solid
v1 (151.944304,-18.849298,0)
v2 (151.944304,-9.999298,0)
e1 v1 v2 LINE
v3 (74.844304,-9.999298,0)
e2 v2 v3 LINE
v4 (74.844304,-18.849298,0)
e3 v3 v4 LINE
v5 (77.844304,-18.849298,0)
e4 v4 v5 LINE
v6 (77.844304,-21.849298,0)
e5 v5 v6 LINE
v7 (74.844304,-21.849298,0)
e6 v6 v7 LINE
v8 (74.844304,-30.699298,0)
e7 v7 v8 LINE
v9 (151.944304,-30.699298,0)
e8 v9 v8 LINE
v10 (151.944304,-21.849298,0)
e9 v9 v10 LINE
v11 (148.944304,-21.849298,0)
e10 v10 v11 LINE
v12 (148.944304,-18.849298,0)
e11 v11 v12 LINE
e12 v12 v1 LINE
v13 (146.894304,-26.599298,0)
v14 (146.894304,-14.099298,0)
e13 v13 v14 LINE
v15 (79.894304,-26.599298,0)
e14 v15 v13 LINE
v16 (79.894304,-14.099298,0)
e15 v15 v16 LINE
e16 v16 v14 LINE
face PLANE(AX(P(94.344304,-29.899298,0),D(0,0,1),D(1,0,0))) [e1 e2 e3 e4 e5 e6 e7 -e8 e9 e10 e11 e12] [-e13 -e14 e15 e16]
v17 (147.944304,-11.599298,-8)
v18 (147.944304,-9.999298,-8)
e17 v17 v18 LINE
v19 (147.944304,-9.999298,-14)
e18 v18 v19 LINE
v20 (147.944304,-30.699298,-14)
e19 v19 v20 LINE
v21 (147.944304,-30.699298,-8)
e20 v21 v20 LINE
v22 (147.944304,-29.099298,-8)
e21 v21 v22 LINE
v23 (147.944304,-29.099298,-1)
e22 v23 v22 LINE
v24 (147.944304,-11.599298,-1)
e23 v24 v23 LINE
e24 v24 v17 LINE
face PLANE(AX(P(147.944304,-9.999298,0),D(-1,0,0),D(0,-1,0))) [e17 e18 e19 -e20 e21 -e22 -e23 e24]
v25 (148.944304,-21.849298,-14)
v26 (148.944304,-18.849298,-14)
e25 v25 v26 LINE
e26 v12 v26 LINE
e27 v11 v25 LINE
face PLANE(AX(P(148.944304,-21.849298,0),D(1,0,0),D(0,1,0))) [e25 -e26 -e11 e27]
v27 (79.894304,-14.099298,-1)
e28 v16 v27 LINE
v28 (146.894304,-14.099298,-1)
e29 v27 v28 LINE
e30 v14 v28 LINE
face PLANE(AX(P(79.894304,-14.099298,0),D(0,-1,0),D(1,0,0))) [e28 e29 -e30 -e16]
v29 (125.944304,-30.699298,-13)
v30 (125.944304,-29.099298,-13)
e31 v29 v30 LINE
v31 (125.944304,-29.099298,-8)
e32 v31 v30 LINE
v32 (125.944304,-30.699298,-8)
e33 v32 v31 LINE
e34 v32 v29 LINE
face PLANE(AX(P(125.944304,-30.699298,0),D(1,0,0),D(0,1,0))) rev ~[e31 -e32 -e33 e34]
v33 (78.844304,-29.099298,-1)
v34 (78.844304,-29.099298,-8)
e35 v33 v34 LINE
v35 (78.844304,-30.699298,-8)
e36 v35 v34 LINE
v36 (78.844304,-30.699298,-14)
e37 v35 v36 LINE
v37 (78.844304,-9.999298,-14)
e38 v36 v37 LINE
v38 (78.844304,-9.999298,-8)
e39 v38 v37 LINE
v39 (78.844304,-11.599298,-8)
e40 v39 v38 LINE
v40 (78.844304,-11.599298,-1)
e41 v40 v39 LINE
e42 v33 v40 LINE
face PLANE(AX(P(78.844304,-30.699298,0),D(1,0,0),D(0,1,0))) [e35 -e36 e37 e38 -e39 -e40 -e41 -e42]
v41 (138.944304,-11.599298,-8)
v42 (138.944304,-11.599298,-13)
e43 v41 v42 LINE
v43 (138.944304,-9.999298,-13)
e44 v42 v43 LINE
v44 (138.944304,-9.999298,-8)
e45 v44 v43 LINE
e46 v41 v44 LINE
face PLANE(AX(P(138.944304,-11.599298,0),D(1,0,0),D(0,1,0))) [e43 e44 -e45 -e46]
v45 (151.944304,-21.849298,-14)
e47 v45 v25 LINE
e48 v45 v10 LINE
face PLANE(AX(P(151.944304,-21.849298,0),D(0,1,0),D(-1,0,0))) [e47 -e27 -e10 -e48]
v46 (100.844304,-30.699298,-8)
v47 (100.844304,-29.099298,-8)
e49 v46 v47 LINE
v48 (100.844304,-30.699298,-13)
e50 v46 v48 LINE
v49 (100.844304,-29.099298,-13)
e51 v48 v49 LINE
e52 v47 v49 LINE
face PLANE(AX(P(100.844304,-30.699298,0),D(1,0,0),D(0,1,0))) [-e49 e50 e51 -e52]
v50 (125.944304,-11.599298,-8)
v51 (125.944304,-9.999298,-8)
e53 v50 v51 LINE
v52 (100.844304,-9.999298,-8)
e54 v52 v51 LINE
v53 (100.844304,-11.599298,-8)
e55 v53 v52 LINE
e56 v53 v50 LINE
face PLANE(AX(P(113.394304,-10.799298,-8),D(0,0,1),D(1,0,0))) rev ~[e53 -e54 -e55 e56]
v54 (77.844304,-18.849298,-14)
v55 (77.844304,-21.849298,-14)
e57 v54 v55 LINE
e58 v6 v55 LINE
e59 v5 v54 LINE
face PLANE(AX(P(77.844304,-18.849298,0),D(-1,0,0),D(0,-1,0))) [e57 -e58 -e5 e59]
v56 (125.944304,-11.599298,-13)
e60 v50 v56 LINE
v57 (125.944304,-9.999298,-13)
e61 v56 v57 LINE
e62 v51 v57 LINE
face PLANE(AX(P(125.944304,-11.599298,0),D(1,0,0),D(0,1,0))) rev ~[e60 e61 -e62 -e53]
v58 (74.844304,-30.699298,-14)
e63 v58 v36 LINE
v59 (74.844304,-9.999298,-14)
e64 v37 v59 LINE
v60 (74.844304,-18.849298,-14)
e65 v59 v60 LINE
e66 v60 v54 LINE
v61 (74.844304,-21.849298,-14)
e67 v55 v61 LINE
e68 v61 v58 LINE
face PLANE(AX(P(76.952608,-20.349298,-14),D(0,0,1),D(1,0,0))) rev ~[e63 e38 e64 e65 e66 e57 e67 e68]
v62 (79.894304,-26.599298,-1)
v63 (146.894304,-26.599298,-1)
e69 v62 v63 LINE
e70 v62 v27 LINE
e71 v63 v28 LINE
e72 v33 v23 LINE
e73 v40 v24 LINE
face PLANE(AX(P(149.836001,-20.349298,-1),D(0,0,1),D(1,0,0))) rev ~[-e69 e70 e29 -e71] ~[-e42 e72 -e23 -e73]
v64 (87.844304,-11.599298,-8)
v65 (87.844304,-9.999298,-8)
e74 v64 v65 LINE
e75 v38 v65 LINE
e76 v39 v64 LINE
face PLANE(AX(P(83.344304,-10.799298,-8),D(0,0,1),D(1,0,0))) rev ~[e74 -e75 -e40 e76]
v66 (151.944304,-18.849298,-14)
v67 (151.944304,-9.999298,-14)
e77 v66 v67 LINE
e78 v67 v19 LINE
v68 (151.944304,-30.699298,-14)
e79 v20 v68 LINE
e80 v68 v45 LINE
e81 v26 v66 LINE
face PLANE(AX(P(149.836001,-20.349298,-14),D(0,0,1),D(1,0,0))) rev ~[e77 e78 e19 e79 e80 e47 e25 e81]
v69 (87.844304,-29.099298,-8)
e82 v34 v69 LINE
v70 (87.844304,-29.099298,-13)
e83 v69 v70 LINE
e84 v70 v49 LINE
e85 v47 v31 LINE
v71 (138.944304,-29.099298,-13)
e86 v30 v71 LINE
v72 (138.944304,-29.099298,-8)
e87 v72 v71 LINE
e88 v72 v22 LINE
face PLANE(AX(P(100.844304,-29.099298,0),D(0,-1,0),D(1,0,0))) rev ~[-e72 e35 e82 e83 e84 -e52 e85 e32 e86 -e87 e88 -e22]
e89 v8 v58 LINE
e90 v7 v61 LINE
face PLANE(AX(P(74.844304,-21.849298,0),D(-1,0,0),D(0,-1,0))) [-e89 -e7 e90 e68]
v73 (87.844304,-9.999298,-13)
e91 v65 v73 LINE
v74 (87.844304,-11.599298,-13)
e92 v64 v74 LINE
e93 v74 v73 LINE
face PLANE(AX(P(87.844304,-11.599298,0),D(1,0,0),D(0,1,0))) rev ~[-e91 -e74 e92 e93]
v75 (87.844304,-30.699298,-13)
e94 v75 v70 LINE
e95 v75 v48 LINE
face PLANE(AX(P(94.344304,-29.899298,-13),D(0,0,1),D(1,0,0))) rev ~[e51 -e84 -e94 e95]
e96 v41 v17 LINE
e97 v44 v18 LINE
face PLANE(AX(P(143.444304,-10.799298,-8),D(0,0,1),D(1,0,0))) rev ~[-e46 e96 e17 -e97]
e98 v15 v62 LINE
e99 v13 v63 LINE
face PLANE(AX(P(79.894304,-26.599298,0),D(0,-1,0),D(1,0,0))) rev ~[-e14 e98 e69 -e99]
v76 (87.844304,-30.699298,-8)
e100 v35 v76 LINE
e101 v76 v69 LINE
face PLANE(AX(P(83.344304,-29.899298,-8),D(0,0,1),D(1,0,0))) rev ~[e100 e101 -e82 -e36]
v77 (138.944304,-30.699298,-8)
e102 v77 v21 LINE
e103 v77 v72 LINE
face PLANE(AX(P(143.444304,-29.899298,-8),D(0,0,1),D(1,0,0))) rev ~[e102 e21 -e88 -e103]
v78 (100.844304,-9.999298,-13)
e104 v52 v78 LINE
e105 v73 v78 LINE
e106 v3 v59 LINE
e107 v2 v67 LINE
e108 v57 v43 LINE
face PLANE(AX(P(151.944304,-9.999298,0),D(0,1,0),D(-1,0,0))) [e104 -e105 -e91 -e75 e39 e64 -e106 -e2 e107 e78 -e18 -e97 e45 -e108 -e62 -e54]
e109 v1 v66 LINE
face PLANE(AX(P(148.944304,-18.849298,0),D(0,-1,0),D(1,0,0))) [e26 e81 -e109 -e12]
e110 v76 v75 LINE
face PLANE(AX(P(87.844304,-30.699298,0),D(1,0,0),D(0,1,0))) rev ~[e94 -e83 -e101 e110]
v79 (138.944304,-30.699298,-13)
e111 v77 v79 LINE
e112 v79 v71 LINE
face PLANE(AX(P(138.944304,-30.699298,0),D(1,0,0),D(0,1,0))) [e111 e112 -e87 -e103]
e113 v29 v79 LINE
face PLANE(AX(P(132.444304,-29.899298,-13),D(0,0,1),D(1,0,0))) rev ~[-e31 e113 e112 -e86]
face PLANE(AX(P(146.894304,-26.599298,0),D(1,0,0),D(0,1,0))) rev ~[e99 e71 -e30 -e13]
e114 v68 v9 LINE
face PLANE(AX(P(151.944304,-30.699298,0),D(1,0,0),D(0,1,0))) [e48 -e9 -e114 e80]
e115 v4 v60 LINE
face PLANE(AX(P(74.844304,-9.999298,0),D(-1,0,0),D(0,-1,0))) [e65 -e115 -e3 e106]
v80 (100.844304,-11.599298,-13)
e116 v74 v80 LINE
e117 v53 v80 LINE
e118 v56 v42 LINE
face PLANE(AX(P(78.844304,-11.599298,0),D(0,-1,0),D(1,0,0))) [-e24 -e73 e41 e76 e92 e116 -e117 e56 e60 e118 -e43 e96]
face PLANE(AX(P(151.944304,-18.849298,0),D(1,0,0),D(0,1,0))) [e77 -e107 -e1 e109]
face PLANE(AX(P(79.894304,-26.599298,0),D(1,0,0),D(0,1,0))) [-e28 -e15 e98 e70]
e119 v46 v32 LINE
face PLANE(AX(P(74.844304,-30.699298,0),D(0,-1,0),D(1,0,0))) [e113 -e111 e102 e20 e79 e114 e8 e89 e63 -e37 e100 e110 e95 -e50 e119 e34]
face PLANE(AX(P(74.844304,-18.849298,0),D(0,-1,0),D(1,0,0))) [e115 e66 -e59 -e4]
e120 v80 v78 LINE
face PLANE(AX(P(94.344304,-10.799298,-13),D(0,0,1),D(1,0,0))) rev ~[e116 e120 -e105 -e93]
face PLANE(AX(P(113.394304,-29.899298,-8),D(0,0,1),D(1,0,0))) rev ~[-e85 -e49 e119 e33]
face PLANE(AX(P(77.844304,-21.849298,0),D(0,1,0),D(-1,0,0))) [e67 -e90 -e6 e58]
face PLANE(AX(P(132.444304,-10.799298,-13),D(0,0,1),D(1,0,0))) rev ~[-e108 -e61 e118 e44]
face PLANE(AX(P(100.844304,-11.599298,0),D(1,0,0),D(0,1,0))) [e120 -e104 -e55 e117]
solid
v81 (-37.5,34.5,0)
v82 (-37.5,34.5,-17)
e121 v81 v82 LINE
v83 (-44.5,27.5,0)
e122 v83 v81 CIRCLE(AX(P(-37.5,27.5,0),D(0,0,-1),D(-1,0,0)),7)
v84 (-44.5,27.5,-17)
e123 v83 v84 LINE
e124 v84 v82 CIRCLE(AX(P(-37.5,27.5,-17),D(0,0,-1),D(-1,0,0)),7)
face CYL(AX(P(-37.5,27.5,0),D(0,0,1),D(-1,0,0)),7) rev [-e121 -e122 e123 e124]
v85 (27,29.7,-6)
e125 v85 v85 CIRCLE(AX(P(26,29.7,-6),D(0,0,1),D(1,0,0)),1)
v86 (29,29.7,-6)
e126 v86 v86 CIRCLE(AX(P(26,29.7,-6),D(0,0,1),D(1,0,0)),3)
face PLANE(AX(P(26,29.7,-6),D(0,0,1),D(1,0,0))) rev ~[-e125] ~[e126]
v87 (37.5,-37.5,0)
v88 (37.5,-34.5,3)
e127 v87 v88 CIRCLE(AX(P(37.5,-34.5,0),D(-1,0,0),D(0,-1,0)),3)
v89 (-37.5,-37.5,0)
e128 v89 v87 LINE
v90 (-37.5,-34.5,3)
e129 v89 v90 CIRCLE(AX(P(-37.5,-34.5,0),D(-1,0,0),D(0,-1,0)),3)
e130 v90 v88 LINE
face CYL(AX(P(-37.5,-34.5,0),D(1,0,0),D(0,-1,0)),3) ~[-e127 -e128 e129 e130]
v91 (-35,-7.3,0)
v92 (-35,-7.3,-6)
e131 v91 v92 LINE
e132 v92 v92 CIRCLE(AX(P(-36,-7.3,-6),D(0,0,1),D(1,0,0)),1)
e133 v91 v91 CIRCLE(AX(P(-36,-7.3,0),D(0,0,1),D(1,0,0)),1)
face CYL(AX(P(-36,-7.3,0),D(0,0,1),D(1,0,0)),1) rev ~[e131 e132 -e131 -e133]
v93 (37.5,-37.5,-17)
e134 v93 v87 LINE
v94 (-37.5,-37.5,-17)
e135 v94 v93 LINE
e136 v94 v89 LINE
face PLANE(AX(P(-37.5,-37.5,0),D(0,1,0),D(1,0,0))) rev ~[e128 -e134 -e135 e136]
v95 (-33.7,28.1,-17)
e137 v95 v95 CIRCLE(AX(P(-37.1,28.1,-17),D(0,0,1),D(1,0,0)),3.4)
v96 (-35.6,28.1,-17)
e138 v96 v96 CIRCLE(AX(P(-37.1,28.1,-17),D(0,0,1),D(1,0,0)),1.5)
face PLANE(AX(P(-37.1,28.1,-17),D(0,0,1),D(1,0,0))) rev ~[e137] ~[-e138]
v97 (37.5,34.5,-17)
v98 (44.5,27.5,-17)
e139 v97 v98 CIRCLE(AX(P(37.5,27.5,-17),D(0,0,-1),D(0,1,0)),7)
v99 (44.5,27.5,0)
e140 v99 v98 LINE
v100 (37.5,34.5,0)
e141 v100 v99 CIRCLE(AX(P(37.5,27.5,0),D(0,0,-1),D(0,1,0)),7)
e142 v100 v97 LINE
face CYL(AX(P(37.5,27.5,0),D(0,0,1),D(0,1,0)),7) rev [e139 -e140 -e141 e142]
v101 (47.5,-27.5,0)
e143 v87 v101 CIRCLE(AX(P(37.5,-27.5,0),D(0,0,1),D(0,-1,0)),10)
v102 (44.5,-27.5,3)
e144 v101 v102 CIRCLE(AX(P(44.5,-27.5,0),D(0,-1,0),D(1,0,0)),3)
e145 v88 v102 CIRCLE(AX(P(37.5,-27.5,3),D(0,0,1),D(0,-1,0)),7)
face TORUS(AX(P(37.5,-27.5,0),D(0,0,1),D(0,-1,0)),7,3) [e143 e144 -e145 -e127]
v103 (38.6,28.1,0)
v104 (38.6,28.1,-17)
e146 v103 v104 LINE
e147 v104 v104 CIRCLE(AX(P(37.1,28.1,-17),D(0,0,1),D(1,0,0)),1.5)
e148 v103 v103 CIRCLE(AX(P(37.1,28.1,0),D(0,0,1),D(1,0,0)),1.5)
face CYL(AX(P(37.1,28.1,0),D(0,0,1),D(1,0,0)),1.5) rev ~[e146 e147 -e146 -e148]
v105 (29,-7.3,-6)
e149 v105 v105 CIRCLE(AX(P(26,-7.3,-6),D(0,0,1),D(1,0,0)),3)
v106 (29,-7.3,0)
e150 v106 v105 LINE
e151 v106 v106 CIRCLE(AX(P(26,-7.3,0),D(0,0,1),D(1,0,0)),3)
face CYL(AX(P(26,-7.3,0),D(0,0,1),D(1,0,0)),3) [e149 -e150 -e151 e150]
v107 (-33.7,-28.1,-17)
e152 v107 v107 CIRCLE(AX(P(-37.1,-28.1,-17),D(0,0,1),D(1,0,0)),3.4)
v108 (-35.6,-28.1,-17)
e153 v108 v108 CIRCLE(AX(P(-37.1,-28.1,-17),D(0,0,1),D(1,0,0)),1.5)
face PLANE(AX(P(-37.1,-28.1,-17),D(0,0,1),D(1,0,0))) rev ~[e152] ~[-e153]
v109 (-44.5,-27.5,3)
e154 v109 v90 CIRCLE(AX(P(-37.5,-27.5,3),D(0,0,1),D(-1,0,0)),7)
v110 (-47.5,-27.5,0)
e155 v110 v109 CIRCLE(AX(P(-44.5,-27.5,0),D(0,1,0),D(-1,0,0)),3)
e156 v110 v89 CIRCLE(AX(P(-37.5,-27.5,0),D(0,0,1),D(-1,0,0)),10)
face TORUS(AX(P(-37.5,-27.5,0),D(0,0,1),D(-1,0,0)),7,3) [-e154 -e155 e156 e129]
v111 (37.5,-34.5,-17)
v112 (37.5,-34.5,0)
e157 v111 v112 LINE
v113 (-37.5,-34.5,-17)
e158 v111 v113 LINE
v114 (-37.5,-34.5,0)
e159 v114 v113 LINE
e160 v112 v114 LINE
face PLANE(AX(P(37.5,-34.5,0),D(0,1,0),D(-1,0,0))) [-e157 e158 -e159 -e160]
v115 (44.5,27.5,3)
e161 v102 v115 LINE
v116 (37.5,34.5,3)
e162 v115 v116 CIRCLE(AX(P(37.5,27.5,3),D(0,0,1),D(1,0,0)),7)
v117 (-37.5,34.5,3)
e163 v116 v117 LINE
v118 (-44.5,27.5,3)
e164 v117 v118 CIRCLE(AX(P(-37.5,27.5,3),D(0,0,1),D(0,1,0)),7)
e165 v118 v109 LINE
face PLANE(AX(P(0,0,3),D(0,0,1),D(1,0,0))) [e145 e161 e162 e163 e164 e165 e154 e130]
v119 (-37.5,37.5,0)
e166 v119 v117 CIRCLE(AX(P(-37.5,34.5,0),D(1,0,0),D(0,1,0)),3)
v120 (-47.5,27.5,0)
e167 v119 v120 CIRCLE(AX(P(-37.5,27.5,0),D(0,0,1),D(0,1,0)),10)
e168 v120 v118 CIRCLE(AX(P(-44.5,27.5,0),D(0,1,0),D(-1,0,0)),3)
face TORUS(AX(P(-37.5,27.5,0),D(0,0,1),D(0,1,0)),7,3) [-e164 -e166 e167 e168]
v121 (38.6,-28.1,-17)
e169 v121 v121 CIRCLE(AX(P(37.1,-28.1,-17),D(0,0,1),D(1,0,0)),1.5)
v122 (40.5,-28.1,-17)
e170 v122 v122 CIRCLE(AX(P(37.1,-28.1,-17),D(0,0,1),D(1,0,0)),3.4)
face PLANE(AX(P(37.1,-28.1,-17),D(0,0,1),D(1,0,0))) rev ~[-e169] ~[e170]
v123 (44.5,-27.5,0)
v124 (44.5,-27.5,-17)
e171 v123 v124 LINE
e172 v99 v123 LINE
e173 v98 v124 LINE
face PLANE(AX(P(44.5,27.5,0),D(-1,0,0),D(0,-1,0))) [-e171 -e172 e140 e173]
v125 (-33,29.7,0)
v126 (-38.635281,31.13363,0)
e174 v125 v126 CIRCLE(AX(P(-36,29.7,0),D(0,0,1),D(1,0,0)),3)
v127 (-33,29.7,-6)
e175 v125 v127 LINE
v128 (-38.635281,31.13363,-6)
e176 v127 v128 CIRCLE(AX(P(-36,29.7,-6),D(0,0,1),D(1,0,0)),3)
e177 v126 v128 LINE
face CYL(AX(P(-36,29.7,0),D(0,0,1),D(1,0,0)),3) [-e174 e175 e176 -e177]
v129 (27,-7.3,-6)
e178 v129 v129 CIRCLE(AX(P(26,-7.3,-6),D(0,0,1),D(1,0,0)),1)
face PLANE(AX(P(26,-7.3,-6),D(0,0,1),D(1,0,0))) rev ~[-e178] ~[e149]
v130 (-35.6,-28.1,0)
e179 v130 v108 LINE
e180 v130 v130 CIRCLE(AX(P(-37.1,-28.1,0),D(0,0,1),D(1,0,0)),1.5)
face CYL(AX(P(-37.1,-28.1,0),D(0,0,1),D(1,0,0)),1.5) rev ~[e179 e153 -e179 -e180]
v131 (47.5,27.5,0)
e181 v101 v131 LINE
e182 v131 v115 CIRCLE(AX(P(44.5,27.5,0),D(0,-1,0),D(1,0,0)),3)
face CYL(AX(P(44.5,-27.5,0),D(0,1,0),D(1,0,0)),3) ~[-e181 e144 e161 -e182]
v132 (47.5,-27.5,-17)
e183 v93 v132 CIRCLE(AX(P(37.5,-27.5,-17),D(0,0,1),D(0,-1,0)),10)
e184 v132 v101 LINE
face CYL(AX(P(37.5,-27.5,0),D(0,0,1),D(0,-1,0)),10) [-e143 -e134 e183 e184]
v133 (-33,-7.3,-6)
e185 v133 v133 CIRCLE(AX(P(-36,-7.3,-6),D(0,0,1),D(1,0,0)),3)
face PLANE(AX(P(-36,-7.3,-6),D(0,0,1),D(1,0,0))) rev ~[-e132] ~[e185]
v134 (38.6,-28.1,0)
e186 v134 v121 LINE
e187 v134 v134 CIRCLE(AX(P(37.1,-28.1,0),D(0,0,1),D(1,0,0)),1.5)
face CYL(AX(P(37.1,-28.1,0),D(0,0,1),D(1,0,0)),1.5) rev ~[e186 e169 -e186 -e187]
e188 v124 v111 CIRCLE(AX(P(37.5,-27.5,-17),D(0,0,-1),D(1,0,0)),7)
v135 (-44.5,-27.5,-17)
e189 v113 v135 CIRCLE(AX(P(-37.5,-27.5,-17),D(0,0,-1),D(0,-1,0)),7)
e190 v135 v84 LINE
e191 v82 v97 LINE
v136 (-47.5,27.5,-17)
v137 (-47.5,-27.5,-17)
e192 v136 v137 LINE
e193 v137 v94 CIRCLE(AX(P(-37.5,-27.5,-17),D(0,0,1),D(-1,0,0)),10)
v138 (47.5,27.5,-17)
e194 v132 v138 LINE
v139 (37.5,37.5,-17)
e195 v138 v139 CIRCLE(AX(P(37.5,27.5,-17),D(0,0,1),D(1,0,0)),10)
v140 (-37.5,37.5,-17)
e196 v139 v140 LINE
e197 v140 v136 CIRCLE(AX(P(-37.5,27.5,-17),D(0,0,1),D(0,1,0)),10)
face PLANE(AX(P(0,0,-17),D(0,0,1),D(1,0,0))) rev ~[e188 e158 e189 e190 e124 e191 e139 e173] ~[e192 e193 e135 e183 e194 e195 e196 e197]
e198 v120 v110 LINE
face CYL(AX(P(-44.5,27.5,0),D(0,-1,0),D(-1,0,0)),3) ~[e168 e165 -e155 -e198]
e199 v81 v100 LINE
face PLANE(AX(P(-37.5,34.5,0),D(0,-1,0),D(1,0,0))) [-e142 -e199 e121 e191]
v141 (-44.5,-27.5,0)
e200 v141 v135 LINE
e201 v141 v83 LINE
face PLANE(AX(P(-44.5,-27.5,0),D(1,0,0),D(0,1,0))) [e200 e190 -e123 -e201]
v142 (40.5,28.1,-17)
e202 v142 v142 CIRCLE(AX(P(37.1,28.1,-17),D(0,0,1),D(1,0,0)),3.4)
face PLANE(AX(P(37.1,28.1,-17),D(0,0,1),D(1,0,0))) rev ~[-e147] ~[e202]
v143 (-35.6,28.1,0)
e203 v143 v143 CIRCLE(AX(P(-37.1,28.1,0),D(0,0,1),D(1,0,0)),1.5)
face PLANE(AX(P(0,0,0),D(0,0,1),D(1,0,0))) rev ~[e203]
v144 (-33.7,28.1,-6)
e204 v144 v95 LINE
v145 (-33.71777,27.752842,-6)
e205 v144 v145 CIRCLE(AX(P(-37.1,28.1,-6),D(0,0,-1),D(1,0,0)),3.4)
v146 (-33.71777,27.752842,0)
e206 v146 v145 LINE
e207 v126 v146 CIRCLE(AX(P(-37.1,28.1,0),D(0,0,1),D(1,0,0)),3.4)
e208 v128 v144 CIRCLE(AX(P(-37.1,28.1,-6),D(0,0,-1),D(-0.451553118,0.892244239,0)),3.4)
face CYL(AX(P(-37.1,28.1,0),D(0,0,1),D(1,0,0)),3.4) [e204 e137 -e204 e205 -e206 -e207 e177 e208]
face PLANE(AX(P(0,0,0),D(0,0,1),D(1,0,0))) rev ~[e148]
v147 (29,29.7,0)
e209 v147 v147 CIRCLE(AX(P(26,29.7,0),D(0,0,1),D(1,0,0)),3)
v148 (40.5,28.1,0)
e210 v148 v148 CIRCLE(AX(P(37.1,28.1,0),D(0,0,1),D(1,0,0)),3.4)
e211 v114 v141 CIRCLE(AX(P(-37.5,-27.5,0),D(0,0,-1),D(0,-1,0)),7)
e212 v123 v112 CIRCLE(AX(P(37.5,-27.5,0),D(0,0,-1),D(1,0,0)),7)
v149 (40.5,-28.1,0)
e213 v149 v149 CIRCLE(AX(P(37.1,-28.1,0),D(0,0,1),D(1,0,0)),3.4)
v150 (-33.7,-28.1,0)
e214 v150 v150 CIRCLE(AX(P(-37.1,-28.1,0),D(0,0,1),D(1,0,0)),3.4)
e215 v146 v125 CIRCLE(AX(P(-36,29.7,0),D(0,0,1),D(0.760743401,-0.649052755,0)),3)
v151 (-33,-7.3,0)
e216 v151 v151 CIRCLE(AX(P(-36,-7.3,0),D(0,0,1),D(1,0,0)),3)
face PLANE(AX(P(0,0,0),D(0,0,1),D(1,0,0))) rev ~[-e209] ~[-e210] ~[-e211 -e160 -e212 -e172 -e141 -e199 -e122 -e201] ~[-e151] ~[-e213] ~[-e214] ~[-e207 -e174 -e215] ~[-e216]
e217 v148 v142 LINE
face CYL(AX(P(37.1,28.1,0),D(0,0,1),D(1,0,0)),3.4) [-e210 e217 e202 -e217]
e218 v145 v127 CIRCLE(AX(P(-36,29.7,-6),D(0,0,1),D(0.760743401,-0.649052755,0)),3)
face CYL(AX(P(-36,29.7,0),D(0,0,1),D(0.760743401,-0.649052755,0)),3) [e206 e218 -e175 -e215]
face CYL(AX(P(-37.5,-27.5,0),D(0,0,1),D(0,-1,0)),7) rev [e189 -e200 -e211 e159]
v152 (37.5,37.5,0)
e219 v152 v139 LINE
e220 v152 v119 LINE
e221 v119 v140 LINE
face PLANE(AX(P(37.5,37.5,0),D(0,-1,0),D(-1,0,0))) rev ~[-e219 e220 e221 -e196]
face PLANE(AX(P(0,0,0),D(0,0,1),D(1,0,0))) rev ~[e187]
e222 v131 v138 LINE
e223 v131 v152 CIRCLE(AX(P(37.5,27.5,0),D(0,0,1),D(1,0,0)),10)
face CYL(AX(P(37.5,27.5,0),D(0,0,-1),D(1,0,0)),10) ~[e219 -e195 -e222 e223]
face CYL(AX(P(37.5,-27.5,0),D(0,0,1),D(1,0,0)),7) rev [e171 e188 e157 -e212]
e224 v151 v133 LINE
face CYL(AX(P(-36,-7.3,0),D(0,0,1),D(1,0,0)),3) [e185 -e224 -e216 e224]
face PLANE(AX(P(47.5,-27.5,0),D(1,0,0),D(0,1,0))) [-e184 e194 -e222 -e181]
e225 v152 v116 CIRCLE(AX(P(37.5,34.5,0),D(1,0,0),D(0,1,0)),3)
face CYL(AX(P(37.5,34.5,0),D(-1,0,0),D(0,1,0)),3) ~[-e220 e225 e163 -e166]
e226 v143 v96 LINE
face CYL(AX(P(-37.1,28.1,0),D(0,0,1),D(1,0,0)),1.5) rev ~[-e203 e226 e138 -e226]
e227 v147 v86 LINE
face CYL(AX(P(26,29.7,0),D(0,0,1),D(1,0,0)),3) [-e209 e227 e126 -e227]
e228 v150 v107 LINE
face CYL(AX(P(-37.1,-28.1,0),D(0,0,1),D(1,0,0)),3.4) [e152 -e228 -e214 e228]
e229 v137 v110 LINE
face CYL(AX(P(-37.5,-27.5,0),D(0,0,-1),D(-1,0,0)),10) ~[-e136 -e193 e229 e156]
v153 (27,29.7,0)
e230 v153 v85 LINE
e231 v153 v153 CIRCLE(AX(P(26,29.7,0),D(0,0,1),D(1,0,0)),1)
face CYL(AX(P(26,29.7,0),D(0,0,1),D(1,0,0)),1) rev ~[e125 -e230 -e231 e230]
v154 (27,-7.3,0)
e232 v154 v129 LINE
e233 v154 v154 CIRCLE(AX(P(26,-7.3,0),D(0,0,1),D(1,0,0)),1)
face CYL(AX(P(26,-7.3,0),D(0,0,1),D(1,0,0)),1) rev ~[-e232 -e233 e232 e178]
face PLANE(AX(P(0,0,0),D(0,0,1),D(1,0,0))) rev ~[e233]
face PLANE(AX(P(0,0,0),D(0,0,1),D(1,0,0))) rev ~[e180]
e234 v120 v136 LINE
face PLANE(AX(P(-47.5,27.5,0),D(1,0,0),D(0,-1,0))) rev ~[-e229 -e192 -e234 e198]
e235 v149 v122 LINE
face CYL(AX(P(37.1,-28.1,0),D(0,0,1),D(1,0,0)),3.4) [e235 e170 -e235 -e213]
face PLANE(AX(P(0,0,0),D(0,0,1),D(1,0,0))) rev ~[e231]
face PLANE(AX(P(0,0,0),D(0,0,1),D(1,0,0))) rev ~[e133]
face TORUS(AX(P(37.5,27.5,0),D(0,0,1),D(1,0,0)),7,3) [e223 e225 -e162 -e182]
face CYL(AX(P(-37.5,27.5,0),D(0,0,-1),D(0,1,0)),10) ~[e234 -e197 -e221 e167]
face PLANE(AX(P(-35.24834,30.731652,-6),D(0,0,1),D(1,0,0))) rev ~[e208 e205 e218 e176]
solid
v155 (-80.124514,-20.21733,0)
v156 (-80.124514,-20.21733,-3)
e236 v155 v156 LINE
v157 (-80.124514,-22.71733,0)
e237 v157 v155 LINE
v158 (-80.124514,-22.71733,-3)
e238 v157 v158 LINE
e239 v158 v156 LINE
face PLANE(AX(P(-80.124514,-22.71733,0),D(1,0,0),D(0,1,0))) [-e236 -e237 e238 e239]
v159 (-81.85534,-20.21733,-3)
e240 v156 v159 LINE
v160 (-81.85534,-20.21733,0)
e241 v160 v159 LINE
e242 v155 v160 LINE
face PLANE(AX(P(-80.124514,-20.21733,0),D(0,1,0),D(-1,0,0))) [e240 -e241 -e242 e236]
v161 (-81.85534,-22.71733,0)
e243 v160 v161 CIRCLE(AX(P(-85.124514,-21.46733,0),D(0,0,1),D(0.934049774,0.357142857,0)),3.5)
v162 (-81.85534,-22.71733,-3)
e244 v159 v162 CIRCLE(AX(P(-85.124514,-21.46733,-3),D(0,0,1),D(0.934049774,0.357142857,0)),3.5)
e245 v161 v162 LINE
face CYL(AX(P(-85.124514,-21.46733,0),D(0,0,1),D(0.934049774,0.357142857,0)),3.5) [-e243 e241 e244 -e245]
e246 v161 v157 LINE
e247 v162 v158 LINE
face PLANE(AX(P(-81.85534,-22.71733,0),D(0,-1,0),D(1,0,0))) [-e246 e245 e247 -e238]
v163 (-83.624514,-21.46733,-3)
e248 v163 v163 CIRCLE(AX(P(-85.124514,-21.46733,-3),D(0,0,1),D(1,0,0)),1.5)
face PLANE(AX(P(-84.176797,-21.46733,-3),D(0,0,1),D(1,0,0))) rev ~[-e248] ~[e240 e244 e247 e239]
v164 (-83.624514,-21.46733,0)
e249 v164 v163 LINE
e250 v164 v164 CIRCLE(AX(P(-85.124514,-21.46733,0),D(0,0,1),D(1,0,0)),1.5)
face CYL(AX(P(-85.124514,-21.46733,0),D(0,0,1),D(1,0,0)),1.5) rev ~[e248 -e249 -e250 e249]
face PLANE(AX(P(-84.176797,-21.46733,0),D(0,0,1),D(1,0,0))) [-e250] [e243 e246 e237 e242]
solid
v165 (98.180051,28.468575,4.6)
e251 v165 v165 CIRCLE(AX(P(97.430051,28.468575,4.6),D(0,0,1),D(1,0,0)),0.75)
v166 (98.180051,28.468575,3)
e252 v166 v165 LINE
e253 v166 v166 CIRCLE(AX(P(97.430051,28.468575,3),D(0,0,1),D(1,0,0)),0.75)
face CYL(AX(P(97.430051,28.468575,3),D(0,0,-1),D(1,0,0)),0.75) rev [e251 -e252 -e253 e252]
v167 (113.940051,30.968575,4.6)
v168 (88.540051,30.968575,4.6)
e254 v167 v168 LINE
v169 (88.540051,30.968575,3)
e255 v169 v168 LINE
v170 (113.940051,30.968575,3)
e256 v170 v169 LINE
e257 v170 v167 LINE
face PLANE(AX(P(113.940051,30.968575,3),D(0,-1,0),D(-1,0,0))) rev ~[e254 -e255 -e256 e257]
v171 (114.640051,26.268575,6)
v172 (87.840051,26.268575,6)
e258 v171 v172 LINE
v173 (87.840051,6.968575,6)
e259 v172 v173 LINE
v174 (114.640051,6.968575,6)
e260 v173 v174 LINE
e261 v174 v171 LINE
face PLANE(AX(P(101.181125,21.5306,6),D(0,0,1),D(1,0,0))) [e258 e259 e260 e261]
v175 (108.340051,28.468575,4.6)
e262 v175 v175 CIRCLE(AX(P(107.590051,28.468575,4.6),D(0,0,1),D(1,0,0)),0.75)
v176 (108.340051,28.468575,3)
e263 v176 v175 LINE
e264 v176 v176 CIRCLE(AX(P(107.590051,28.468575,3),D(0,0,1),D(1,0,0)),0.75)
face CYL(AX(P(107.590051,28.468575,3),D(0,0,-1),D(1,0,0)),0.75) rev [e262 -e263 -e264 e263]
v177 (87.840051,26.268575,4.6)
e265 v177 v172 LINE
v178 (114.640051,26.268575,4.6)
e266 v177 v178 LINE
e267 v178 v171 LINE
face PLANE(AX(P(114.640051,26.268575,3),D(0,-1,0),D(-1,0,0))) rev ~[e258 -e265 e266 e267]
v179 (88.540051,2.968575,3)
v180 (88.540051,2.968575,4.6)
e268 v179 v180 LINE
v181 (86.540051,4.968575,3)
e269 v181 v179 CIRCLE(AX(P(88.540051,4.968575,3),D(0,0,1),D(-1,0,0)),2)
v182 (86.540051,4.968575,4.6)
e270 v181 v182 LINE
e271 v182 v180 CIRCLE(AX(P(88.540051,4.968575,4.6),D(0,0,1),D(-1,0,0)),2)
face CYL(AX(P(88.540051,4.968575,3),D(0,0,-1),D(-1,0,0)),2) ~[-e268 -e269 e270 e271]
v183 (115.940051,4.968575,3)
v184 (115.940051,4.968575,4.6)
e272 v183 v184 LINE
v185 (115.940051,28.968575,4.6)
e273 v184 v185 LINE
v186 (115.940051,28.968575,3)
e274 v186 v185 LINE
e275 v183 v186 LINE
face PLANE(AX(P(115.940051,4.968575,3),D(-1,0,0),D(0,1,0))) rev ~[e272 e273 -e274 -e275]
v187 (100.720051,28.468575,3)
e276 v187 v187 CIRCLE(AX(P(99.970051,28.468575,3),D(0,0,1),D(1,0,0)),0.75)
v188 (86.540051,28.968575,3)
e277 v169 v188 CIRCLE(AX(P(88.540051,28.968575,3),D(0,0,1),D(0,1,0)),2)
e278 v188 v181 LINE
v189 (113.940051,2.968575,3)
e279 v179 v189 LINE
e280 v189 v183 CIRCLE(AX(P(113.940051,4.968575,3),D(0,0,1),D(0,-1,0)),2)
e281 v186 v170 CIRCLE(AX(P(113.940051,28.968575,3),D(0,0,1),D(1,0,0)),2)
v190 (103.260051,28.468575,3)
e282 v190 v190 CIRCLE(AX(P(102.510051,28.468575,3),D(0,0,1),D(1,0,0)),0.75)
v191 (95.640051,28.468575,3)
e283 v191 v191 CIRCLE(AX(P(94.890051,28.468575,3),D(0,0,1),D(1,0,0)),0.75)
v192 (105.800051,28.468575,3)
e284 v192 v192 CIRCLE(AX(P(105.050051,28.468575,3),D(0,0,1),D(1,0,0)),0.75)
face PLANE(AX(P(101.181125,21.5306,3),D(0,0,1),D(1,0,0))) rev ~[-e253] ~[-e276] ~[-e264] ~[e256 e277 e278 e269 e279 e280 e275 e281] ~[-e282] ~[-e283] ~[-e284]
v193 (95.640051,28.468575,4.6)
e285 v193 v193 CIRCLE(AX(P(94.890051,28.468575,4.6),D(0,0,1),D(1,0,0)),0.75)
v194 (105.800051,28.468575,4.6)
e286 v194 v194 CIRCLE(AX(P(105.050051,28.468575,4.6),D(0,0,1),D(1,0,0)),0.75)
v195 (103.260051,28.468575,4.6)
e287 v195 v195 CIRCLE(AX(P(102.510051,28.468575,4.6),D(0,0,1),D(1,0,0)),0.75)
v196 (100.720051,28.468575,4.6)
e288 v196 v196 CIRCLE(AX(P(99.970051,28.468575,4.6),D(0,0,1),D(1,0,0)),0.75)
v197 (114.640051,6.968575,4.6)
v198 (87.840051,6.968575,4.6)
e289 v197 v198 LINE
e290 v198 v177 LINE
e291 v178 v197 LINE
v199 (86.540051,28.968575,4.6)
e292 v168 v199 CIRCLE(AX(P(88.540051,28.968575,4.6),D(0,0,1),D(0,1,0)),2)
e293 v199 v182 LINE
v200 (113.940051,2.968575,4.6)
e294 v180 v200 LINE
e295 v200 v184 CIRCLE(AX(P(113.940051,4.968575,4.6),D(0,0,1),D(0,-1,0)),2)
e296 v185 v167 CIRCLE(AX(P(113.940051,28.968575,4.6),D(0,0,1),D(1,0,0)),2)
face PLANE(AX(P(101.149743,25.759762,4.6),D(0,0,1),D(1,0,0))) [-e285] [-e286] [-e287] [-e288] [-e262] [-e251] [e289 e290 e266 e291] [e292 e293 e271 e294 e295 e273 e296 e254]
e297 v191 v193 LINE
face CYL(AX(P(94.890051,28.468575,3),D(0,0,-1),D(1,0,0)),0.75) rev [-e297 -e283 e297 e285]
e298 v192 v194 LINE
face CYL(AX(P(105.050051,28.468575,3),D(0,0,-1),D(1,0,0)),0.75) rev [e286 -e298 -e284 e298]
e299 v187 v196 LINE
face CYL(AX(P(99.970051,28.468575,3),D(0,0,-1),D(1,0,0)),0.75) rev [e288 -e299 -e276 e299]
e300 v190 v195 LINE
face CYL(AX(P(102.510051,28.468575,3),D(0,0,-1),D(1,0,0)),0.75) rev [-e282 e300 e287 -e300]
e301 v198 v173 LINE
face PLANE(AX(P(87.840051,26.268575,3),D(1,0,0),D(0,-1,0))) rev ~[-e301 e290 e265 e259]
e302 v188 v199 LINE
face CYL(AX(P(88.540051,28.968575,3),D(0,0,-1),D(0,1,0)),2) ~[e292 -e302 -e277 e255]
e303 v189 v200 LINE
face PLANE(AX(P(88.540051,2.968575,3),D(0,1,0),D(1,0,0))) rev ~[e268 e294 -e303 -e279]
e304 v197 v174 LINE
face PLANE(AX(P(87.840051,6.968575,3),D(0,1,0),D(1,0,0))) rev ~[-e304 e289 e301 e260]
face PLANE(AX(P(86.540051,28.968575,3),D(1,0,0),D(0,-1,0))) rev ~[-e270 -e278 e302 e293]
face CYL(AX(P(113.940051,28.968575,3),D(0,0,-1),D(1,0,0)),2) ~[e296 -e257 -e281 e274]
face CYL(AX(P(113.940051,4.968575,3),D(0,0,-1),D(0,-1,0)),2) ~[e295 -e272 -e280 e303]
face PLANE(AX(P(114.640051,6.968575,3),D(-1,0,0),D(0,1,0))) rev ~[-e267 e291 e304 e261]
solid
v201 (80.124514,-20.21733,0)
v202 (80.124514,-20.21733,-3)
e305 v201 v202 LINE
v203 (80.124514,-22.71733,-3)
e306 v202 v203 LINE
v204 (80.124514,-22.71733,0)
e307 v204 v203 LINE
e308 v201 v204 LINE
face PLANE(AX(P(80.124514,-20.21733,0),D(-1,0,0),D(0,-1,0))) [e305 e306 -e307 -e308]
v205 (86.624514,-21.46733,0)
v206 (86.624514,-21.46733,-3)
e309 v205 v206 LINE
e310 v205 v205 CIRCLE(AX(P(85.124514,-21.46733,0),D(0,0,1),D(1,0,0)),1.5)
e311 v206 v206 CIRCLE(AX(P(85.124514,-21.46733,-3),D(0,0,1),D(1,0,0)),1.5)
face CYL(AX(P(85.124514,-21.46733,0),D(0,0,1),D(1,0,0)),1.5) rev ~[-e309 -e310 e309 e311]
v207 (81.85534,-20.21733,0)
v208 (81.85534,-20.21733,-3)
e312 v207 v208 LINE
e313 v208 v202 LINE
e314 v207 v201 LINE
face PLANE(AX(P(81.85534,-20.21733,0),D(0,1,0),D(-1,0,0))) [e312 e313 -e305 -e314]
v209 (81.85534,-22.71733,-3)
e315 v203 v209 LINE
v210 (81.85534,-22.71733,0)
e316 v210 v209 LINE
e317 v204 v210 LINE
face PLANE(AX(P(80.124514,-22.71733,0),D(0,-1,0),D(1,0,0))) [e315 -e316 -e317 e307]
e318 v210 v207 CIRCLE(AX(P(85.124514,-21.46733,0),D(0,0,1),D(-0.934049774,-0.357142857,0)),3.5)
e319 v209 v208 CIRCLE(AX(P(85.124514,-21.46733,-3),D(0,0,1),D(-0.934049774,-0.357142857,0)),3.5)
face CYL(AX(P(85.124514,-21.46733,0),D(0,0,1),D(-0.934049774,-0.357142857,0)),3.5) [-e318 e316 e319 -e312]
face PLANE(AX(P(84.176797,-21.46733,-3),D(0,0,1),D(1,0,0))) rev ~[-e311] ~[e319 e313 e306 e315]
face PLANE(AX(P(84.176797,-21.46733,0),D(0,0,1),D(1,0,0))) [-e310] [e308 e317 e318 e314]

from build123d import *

# Parameters (mm, degrees)
F1_W      = 9
F1_H      = 1.6
F1_W_2    = 13
F1_W_3    = 25.1
F1_W_4    = 67
F1_H_2    = 12.5
F3_DEPTH  = 1
F4_DEPTH  = 14
F5_DEPTH  = 8
F6_DEPTH  = 13
F0_R      = 1.5
F7_DEPTH  = 3
F0_R_2    = 3.4
F8_DEPTH  = 3
F9_DEPTH  = 17
F10_R     = 3
F11_R     = 0.75
F11_W     = 26.8
F11_H     = 3.8
F12_DEPTH = 1.6
F13_DEPTH = 3
F2_R      = 3
F2_R_2    = 1
F14_DEPTH = 6


with BuildPart() as f3:
    # F1 (on face) → F3 (new body)
    with BuildSketch(Plane.XY):
        Polygon((147.9443044477, -29.0992980018), (147.9443044477, -30.6992980018), (151.9443044477, -30.6992980018), (151.9443044477, -21.8492980018), (148.9443044477, -21.8492980018), (148.9443044477, -18.8492980018), (151.9443044477, -18.8492980018), (151.9443044477, -9.9992980018), (147.9443044477, -9.9992980018), (147.9443044477, -11.5992980018), align=None)
        with Locations((83.3443044477, -29.8992980018)):
            Rectangle(F1_W, F1_H)
        with Locations((94.3443044477, -29.8992980018)):
            Rectangle(F1_W_2, F1_H)
        with Locations((113.3943044477, -29.8992980018)):
            Rectangle(F1_W_3, F1_H)
        with Locations((132.4443044477, -29.8992980018)):
            Rectangle(F1_W_2, F1_H)
        with Locations((143.4443044477, -29.8992980018)):
            Rectangle(F1_W, F1_H)
        with Locations((83.3443044477, -10.7992980018)):
            Rectangle(F1_W, F1_H)
        with Locations((94.3443044477, -10.7992980018)):
            Rectangle(F1_W_2, F1_H)
        with Locations((113.3943044477, -10.7992980018)):
            Rectangle(F1_W_3, F1_H)
        with Locations((132.4443044477, -10.7992980018)):
            Rectangle(F1_W_2, F1_H)
        with Locations((143.4443044477, -10.7992980018)):
            Rectangle(F1_W, F1_H)
        Polygon((74.8443044477, -21.8492980018), (74.8443044477, -30.6992980018), (78.8443044477, -30.6992980018), (78.8443044477, -29.0992980018), (78.8443044477, -11.5992980018), (78.8443044477, -9.9992980018), (74.8443044477, -9.9992980018), (74.8443044477, -18.8492980018), (77.8443044477, -18.8492980018), (77.8443044477, -20.3492980018), (77.8443044477, -21.8492980018), align=None)
        Polygon((78.8443044477, -11.5992980018), (78.8443044477, -29.0992980018), (87.8443044477, -29.0992980018), (100.8443044477, -29.0992980018), (125.9443044477, -29.0992980018), (138.9443044477, -29.0992980018), (147.9443044477, -29.0992980018), (147.9443044477, -11.5992980018), (138.9443044477, -11.5992980018), (125.9443044477, -11.5992980018), (100.8443044477, -11.5992980018), (87.8443044477, -11.5992980018), align=None)
        with Locations((113.3943044477, -20.3492980018)):
            Rectangle(F1_W_4, F1_H_2, mode=Mode.SUBTRACT)
    extrude(amount=-F3_DEPTH)

    # F1 (on face) → F4 (join)
    with BuildSketch(Plane.XY):
        Polygon((74.8443044477, -21.8492980018), (74.8443044477, -30.6992980018), (78.8443044477, -30.6992980018), (78.8443044477, -29.0992980018), (78.8443044477, -11.5992980018), (78.8443044477, -9.9992980018), (74.8443044477, -9.9992980018), (74.8443044477, -18.8492980018), (77.8443044477, -18.8492980018), (77.8443044477, -20.3492980018), (77.8443044477, -21.8492980018), align=None)
        Polygon((147.9443044477, -29.0992980018), (147.9443044477, -30.6992980018), (151.9443044477, -30.6992980018), (151.9443044477, -21.8492980018), (148.9443044477, -21.8492980018), (148.9443044477, -18.8492980018), (151.9443044477, -18.8492980018), (151.9443044477, -9.9992980018), (147.9443044477, -9.9992980018), (147.9443044477, -11.5992980018), align=None)
    extrude(amount=-F4_DEPTH)

    # F1 (on face) → F5 (join)
    with BuildSketch(Plane.XY):
        with Locations((83.3443044477, -29.8992980018)):
            Rectangle(F1_W, F1_H)
        with Locations((113.3943044477, -29.8992980018)):
            Rectangle(F1_W_3, F1_H)
        with Locations((143.4443044477, -29.8992980018)):
            Rectangle(F1_W, F1_H)
        with Locations((143.4443044477, -10.7992980018)):
            Rectangle(F1_W, F1_H)
        with Locations((113.3943044477, -10.7992980018)):
            Rectangle(F1_W_3, F1_H)
        with Locations((83.3443044477, -10.7992980018)):
            Rectangle(F1_W, F1_H)
    extrude(amount=-F5_DEPTH)

    # F1 (on face) → F6 (join)
    with BuildSketch(Plane.XY):
        with Locations((94.3443044477, -29.8992980018)):
            Rectangle(F1_W_2, F1_H)
        with Locations((132.4443044477, -29.8992980018)):
            Rectangle(F1_W_2, F1_H)
        with Locations((132.4443044477, -10.7992980018)):
            Rectangle(F1_W_2, F1_H)
        with Locations((94.3443044477, -10.7992980018)):
            Rectangle(F1_W_2, F1_H)
    extrude(amount=-F6_DEPTH)


with BuildPart() as f7:
    # F0 (on Top) → F7 (new body)
    with BuildSketch(Plane.XY):
        with BuildLine():
            ThreePointArc((-81.8553396934, -20.217330035), (-88.6245139011, -21.467330035), (-81.8553396934, -22.717330035))
            Line((-81.8553396934, -22.717330035), (-80.1245139011, -22.717330035))
            Line((-80.1245139011, -22.717330035), (-80.1245139011, -20.217330035))
            Line((-80.1245139011, -20.217330035), (-81.8553396934, -20.217330035))
        make_face()
        with Locations((-85.1245139011, -21.467330035)):
            Circle(F0_R, mode=Mode.SUBTRACT)
    extrude(amount=-F7_DEPTH)


with BuildPart() as f7b:
    # F0 (on Top) → F7, piece 2 (new body)
    with BuildSketch(Plane.XY):
        with BuildLine():
            Line((-47.5, 27.5), (-47.5, -27.5))
            ThreePointArc((-47.5, -27.5), (-44.5710678119, -34.5710678119), (-37.5, -37.5))
            Line((-37.5, -37.5), (37.5, -37.5))
            ThreePointArc((37.5, -37.5), (44.5710678119, -34.5710678119), (47.5, -27.5))
            Line((47.5, -27.5), (47.5, 27.5))
            ThreePointArc((47.5, 27.5), (44.5710678119, 34.5710678119), (37.5, 37.5))
            Line((37.5, 37.5), (-37.5, 37.5))
            ThreePointArc((-37.5, 37.5), (-44.5710678119, 34.5710678119), (-47.5, 27.5))
        make_face()
        with BuildLine():
            Line((37.5, -34.5), (-37.5, -34.5))
            ThreePointArc((-37.5, -34.5), (-42.4497474683, -32.4497474683), (-44.5, -27.5))
            Line((-44.5, -27.5), (-44.5, 27.5))
            ThreePointArc((-44.5, 27.5), (-42.4497474683, 32.4497474683), (-37.5, 34.5))
            Line((-37.5, 34.5), (37.5, 34.5))
            ThreePointArc((37.5, 34.5), (42.4497474683, 32.4497474683), (44.5, 27.5))
            Line((44.5, 27.5), (44.5, -27.5))
            ThreePointArc((44.5, -27.5), (42.4497474683, -32.4497474683), (37.5, -34.5))
        make_face(mode=Mode.SUBTRACT)
    extrude(amount=-F7_DEPTH)

    # F0 (on Top) → F8 (join)
    with BuildSketch(Plane.XY):
        with BuildLine():
            Line((-47.5, 27.5), (-47.5, -27.5))
            ThreePointArc((-47.5, -27.5), (-44.5710678119, -34.5710678119), (-37.5, -37.5))
            Line((-37.5, -37.5), (37.5, -37.5))
            ThreePointArc((37.5, -37.5), (44.5710678119, -34.5710678119), (47.5, -27.5))
            Line((47.5, -27.5), (47.5, 27.5))
            ThreePointArc((47.5, 27.5), (44.5710678119, 34.5710678119), (37.5, 37.5))
            Line((37.5, 37.5), (-37.5, 37.5))
            ThreePointArc((-37.5, 37.5), (-44.5710678119, 34.5710678119), (-47.5, 27.5))
        make_face()
        with BuildLine():
            Line((37.5, -34.5), (-37.5, -34.5))
            ThreePointArc((-37.5, -34.5), (-42.4497474683, -32.4497474683), (-44.5, -27.5))
            Line((-44.5, -27.5), (-44.5, 27.5))
            ThreePointArc((-44.5, 27.5), (-42.4497474683, 32.4497474683), (-37.5, 34.5))
            Line((-37.5, 34.5), (37.5, 34.5))
            ThreePointArc((37.5, 34.5), (42.4497474683, 32.4497474683), (44.5, 27.5))
            Line((44.5, 27.5), (44.5, -27.5))
            ThreePointArc((44.5, -27.5), (42.4497474683, -32.4497474683), (37.5, -34.5))
        make_face(mode=Mode.SUBTRACT)
        with BuildLine():
            ThreePointArc((-44.5, -27.5), (-42.4497474683, -32.4497474683), (-37.5, -34.5))
            Line((-37.5, -34.5), (37.5, -34.5))
            ThreePointArc((37.5, -34.5), (42.4497474683, -32.4497474683), (44.5, -27.5))
            Line((44.5, -27.5), (44.5, 27.5))
            ThreePointArc((44.5, 27.5), (42.4497474683, 32.4497474683), (37.5, 34.5))
            Line((37.5, 34.5), (-37.5, 34.5))
            ThreePointArc((-37.5, 34.5), (-42.4497474683, 32.4497474683), (-44.5, 27.5))
            Line((-44.5, 27.5), (-44.5, -27.5))
        make_face()
        with Locations((-37.1, -28.1)):
            Circle(F0_R_2, mode=Mode.SUBTRACT)
        with Locations((37.1, -28.1)):
            Circle(F0_R_2, mode=Mode.SUBTRACT)
        with Locations((-37.1, 28.1)):
            Circle(F0_R_2, mode=Mode.SUBTRACT)
        with Locations((37.1, 28.1)):
            Circle(F0_R_2, mode=Mode.SUBTRACT)
        with Locations((-37.1, -28.1)):
            Circle(F0_R_2)
        with Locations((-37.1, -28.1)):
            Circle(F0_R, mode=Mode.SUBTRACT)
        with Locations((37.1, -28.1)):
            Circle(F0_R_2)
        with Locations((37.1, -28.1)):
            Circle(F0_R, mode=Mode.SUBTRACT)
        with Locations((-37.1, 28.1)):
            Circle(F0_R_2)
        with Locations((-37.1, 28.1)):
            Circle(F0_R, mode=Mode.SUBTRACT)
        with Locations((37.1, 28.1)):
            Circle(F0_R_2)
        with Locations((37.1, 28.1)):
            Circle(F0_R, mode=Mode.SUBTRACT)
        with Locations((-37.1, -28.1)):
            Circle(F0_R)
        with Locations((37.1, -28.1)):
            Circle(F0_R)
        with Locations((-37.1, 28.1)):
            Circle(F0_R)
        with Locations((37.1, 28.1)):
            Circle(F0_R)
    extrude(amount=F8_DEPTH)

    # F0 (on Top) → F9 (join)
    with BuildSketch(Plane.XY):
        with BuildLine():
            Line((-47.5, 27.5), (-47.5, -27.5))
            ThreePointArc((-47.5, -27.5), (-44.5710678119, -34.5710678119), (-37.5, -37.5))
            Line((-37.5, -37.5), (37.5, -37.5))
            ThreePointArc((37.5, -37.5), (44.5710678119, -34.5710678119), (47.5, -27.5))
            Line((47.5, -27.5), (47.5, 27.5))
            ThreePointArc((47.5, 27.5), (44.5710678119, 34.5710678119), (37.5, 37.5))
            Line((37.5, 37.5), (-37.5, 37.5))
            ThreePointArc((-37.5, 37.5), (-44.5710678119, 34.5710678119), (-47.5, 27.5))
        make_face()
        with BuildLine():
            Line((37.5, -34.5), (-37.5, -34.5))
            ThreePointArc((-37.5, -34.5), (-42.4497474683, -32.4497474683), (-44.5, -27.5))
            Line((-44.5, -27.5), (-44.5, 27.5))
            ThreePointArc((-44.5, 27.5), (-42.4497474683, 32.4497474683), (-37.5, 34.5))
            Line((-37.5, 34.5), (37.5, 34.5))
            ThreePointArc((37.5, 34.5), (42.4497474683, 32.4497474683), (44.5, 27.5))
            Line((44.5, 27.5), (44.5, -27.5))
            ThreePointArc((44.5, -27.5), (42.4497474683, -32.4497474683), (37.5, -34.5))
        make_face(mode=Mode.SUBTRACT)
        with Locations((-37.1, -28.1)):
            Circle(F0_R_2)
        with Locations((-37.1, -28.1)):
            Circle(F0_R, mode=Mode.SUBTRACT)
        with Locations((37.1, -28.1)):
            Circle(F0_R_2)
        with Locations((37.1, -28.1)):
            Circle(F0_R, mode=Mode.SUBTRACT)
        with Locations((37.1, 28.1)):
            Circle(F0_R_2)
        with Locations((37.1, 28.1)):
            Circle(F0_R, mode=Mode.SUBTRACT)
        with Locations((-37.1, 28.1)):
            Circle(F0_R_2)
        with Locations((-37.1, 28.1)):
            Circle(F0_R, mode=Mode.SUBTRACT)
    extrude(amount=-F9_DEPTH)

    # F10
    f10_edges = [f7b.edges().sort_by_distance(p)[0] for p in [
        (-47.5, 0, 3),
        (-44.571068, -34.571068, 3),
        (0, -37.5, 3),
        (44.571068, -34.571068, 3),
        (47.5, 0, 3),
        (44.571068, 34.571068, 3),
        (0, 37.5, 3),
        (-44.571068, 34.571068, 3),
    ]]
    fillet(f10_edges, radius=F10_R)

    # F2 (on face) → F14 (join)
    with BuildSketch(Plane.XY):
        with BuildLine():
            ThreePointArc((-33, 29.7), (-35.2603520431, 32.6073907374), (-38.6352805999, 31.1336304125))
            ThreePointArc((-38.6352805999, 31.1336304125), (-35.3195441651, 30.9965457048), (-33.7, 28.1))
            ThreePointArc((-33.7, 28.1), (-33.7044453555, 27.9261936236), (-33.7177697979, 27.7528417361))
            ThreePointArc((-33.7177697979, 27.7528417361), (-33.185156256, 28.6623802735), (-33, 29.7))
        make_face()
        with Locations((26, 29.7)):
            Circle(F2_R)
        with Locations((26, 29.7)):
            Circle(F2_R_2, mode=Mode.SUBTRACT)
        with Locations((26, -7.3)):
            Circle(F2_R)
        with Locations((26, -7.3)):
            Circle(F2_R_2, mode=Mode.SUBTRACT)
        with Locations((-36, -7.3)):
            Circle(F2_R)
        with Locations((-36, -7.3)):
            Circle(F2_R_2, mode=Mode.SUBTRACT)
    extrude(amount=-F14_DEPTH)


with BuildPart() as f7c:
    # F0 (on Top) → F7, piece 3 (new body)
    with BuildSketch(Plane.XY):
        with BuildLine():
            Line((80.1245139011, -22.717330035), (81.8553396934, -22.717330035))
            ThreePointArc((81.8553396934, -22.717330035), (88.6245139011, -21.467330035), (81.8553396934, -20.217330035))
            Line((81.8553396934, -20.217330035), (80.1245139011, -20.217330035))
            Line((80.1245139011, -20.217330035), (80.1245139011, -22.717330035))
        make_face()
        with Locations((85.1245139011, -21.467330035)):
            Circle(F0_R, mode=Mode.SUBTRACT)
    extrude(amount=-F7_DEPTH)


with BuildPart() as f12:
    # F11 (on face) → F12 (new body)
    with BuildSketch(Plane.XY.offset(3)):
        with BuildLine():
            ThreePointArc((115.9400514501, 28.9685745354), (115.3542650125, 30.3827880978), (113.9400514501, 30.9685745354))
            Line((113.9400514501, 30.9685745354), (88.5400514501, 30.9685745354))
            ThreePointArc((88.5400514501, 30.9685745354), (87.1258378878, 30.3827880978), (86.5400514501, 28.9685745354))
            Line((86.5400514501, 28.9685745354), (86.5400514501, 16.6185745354))
            Line((86.5400514501, 16.6185745354), (87.8400514501, 16.6340507259))
            Line((87.8400514501, 16.6340507259), (87.8400514501, 26.2685745354))
            Line((87.8400514501, 26.2685745354), (114.6400514501, 26.2685745354))
            Line((114.6400514501, 26.2685745354), (114.6400514501, 16.9530983449))
            Line((114.6400514501, 16.9530983449), (115.9400514501, 16.9685745354))
            Line((115.9400514501, 16.9685745354), (115.9400514501, 28.9685745354))
        make_face()
        with Locations((94.8900514501, 28.4685745354)):
            Circle(F11_R, mode=Mode.SUBTRACT)
        with Locations((97.4300514501, 28.4685745354)):
            Circle(F11_R, mode=Mode.SUBTRACT)
        with Locations((99.9700514501, 28.4685745354)):
            Circle(F11_R, mode=Mode.SUBTRACT)
        with Locations((102.5100514501, 28.4685745354)):
            Circle(F11_R, mode=Mode.SUBTRACT)
        with Locations((105.0500514501, 28.4685745354)):
            Circle(F11_R, mode=Mode.SUBTRACT)
        with Locations((107.5900514501, 28.4685745354)):
            Circle(F11_R, mode=Mode.SUBTRACT)
        with BuildLine():
            Line((115.9400514501, 4.9685745354), (115.9400514501, 16.9685745354))
            Line((115.9400514501, 16.9685745354), (114.6400514501, 16.9530983449))
            Line((114.6400514501, 16.9530983449), (114.6400514501, 10.7685745354))
            Line((114.6400514501, 10.7685745354), (114.6400514501, 6.9685745354))
            Line((114.6400514501, 6.9685745354), (87.8400514501, 6.9685745354))
            Line((87.8400514501, 6.9685745354), (87.8400514501, 10.7685745354))
            Line((87.8400514501, 10.7685745354), (87.8400514501, 16.6340507259))
            Line((87.8400514501, 16.6340507259), (86.5400514501, 16.6185745354))
            Line((86.5400514501, 16.6185745354), (86.5400514501, 4.9685745354))
            ThreePointArc((86.5400514501, 4.9685745354), (87.1258378878, 3.554360973), (88.5400514501, 2.9685745354))
            Line((88.5400514501, 2.9685745354), (113.9400514501, 2.9685745354))
            ThreePointArc((113.9400514501, 2.9685745354), (115.3542650125, 3.554360973), (115.9400514501, 4.9685745354))
        make_face()
        Polygon((87.8400514501, 16.6340507259), (114.6400514501, 16.9530983449), (114.6400514501, 26.2685745354), (87.8400514501, 26.2685745354), align=None)
        Polygon((114.6400514501, 10.7685745354), (114.6400514501, 16.9530983449), (87.8400514501, 16.6340507259), (87.8400514501, 10.7685745354), align=None)
        with Locations((101.2400514501, 8.8685745354)):
            Rectangle(F11_W, F11_H)
    extrude(amount=F12_DEPTH)

    # F11 (on face) → F13 (join)
    with BuildSketch(Plane.XY.offset(3)):
        Polygon((87.8400514501, 16.6340507259), (114.6400514501, 16.9530983449), (114.6400514501, 26.2685745354), (87.8400514501, 26.2685745354), align=None)
        Polygon((114.6400514501, 10.7685745354), (114.6400514501, 16.9530983449), (87.8400514501, 16.6340507259), (87.8400514501, 10.7685745354), align=None)
        with Locations((101.2400514501, 8.8685745354)):
            Rectangle(F11_W, F11_H)
    extrude(amount=F13_DEPTH)


solid = Compound([f3.part, f7.part, f7b.part, f7c.part, f12.part])
